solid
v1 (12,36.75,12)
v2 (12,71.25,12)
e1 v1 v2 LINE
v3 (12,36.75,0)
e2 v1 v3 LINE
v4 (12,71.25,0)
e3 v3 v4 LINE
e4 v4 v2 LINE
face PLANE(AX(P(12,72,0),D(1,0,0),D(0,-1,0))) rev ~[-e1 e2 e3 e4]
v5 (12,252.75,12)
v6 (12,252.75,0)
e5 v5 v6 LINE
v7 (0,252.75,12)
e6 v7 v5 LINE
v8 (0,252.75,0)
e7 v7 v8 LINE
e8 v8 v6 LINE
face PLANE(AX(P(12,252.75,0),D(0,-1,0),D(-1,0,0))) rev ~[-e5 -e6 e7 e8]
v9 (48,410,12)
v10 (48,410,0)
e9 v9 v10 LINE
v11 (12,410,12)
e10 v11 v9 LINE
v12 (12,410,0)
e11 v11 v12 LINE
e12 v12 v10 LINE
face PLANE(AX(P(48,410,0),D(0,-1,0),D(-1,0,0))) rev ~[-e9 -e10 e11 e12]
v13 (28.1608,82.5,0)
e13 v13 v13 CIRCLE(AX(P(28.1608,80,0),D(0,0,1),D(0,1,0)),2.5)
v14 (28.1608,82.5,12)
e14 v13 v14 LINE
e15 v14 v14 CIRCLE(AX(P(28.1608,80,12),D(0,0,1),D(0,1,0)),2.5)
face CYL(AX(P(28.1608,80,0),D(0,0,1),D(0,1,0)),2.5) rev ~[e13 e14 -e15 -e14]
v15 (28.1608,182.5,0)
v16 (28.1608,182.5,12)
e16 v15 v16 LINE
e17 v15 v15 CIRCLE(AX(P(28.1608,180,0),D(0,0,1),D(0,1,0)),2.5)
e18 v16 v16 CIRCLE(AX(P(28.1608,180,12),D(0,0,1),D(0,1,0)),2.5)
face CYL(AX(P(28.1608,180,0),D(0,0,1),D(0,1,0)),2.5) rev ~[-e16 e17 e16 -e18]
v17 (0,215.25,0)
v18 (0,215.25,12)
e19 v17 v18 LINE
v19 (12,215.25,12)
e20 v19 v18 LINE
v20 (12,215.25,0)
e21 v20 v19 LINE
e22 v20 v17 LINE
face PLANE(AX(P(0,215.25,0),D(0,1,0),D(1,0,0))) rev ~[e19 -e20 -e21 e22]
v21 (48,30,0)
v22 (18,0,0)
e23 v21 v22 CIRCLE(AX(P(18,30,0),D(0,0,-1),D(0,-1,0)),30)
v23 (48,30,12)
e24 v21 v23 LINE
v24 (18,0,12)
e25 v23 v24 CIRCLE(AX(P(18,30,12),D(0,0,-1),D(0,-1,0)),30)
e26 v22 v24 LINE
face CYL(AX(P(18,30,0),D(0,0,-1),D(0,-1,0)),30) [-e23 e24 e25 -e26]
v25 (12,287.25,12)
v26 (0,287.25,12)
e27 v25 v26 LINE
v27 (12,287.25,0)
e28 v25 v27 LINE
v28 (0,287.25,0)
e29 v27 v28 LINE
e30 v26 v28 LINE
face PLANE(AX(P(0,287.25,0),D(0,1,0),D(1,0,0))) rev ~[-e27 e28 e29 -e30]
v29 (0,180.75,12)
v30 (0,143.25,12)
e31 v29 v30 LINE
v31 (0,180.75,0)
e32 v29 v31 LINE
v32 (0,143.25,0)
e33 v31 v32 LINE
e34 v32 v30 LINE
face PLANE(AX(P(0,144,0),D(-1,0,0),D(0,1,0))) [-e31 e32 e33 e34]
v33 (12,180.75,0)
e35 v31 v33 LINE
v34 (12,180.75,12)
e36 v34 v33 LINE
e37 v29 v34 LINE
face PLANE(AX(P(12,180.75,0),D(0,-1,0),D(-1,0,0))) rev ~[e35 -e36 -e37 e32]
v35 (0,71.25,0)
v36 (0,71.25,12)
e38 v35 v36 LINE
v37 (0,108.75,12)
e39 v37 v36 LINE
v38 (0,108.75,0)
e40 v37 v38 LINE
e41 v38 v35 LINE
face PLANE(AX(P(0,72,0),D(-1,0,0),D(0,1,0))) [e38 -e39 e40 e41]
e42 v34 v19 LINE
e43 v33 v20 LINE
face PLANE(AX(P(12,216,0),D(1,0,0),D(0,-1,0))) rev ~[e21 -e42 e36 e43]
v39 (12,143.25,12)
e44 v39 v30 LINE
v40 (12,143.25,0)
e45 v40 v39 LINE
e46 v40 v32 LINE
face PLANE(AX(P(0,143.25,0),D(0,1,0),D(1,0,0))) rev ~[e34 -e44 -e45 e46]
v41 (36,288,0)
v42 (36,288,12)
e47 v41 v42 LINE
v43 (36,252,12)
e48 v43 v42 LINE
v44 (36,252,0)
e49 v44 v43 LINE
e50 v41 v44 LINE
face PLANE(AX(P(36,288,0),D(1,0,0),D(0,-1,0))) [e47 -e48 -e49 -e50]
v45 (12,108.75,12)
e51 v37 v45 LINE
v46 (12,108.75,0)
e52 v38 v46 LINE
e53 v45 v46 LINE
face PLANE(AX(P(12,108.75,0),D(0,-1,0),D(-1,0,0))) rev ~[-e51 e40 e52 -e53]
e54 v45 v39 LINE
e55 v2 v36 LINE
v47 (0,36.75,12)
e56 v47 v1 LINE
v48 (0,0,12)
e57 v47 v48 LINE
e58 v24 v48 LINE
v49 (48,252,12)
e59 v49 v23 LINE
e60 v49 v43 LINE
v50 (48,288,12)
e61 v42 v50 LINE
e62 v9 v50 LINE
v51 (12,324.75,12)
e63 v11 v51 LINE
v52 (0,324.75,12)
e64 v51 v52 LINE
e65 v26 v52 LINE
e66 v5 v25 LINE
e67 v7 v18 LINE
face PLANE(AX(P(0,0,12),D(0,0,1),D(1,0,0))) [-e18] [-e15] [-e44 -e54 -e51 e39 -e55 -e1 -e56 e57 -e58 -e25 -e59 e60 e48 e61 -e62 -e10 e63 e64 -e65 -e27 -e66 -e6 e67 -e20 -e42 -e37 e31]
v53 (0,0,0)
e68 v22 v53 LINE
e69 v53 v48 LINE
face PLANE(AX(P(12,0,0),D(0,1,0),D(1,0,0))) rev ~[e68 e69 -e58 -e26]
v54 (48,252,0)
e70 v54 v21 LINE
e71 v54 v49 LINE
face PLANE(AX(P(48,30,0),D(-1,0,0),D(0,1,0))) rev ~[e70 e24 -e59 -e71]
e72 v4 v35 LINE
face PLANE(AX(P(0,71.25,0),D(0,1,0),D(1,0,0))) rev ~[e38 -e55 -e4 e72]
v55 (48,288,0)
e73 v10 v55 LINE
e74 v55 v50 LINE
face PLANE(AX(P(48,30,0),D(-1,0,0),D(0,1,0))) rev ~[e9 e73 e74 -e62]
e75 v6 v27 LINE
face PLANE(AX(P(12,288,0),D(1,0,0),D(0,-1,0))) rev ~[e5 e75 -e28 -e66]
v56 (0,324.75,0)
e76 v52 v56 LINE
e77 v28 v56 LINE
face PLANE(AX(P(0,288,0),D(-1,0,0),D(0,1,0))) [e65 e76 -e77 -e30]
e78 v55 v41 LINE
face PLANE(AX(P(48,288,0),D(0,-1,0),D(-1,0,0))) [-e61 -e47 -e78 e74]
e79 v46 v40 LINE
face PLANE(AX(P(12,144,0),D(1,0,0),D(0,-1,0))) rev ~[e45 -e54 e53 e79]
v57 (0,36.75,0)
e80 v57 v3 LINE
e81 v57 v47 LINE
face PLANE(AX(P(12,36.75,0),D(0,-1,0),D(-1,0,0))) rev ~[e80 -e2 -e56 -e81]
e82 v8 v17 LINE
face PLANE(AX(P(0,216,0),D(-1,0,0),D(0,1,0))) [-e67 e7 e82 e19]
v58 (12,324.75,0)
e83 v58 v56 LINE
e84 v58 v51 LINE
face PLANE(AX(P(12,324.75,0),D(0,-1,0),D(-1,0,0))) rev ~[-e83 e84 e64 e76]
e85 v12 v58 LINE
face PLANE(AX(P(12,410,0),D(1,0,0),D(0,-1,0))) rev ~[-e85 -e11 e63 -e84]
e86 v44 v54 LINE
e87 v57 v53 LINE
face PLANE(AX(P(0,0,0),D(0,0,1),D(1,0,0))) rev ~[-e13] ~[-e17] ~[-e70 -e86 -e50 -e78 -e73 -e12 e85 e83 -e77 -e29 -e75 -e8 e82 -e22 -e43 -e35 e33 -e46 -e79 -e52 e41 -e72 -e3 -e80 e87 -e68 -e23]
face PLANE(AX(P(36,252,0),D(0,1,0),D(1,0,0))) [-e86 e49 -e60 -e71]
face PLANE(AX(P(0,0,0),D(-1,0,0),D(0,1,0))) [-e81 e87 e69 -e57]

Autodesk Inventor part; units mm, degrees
ref_plane "YZ Plane" through (0, 0, 0) normal (1, 0, 0) x (0, 1, 0)
ref_plane "XZ Plane" through (0, 0, 0) normal (0, 1, 0) x (-1, 0, 0)
ref_plane "XY Plane" through (0, 0, 0) normal (0, 0, 1) x (1, 0, 0)
ref_plane "Work Plane1" through (0, 0, 0) normal (0, 0, 1) x (1, 0, 0)
sketch "Sketch1" plane through (0, 0, 0) normal (0, 0, 1) x (1, 0, 0)
  line L0 (12, 534.827) -> (0, 534.827)
  line L1 (0, 534.827) -> (0, 622.3733)
  line L2 (0, 622.3733) -> (12, 622.3733)
  line L3 (12, 622.3733) -> (12, 534.827)
  line L4 (0, 476.4832) -> (12, 476.4832)
  line L5 (12, 476.4832) -> (12, 324)
  line L6 (12, 324) -> (0, 324)
  line L7 (0, 288) -> (0, 324)
  line L8 (0, 288) -> (12, 288)
  line L9 (12, 288) -> (12, 252)
  line L10 (12, 252) -> (0, 252)
  line L11 (0, 216) -> (0, 252)
  line L12 (0, 216) -> (12, 216)
  line L13 (12, 216) -> (12, 180)
  line L14 (12, 180) -> (0, 180)
  line L15 (0, 144) -> (0, 180)
  line L16 (0, 144) -> (12, 144)
  line L17 (12, 144) -> (12, 108)
  line L18 (12, 108) -> (0, 108)
  line L19 (0, 72) -> (0, 108)
  line L20 (0, 72) -> (12, 72)
  line L21 (12, 72) -> (12, 36)
  line L22 (12, 36) -> (0, 36)
  line L23 (0, 0) -> (0, 36)
  line L24 (12, 0) -> (0, 0)
  line L25 (12, 36) -> (12, 0)
  line L26 (0, 324) -> (0, 476.4832)
  line L27 (12, 324) -> (12, 288)
  line L28 (0, 252) -> (0, 288)
  line L29 (12, 252) -> (12, 216)
  line L30 (0, 180) -> (0, 216)
  line L31 (12, 180) -> (12, 144)
  line L32 (0, 108) -> (0, 144)
  line L33 (12, 108) -> (12, 72)
  line L34 (0, 36) -> (0, 72)
  line L35 (12, 0) -> (18, 0)
  line L36 (48, 30) -> (48, 410)
  line L37 (48, 410) -> (12, 410)
  line L38 (12, 410) -> (12, 0)
  arc A0 (18, 0) -> (48, 30) centre (18, 30) ccw
  point P0 (48, 0)
  dimension "d0" = 36
  dimension "d1" = 410
  dimension "d34" = 30
extrude "Extrusion1" add sketch "Sketch1" along normal blind 12 contours L6 L27 L8 L7 | L37 L36 A0 L35 L25 L21 L33 L17 L31 L13 L29 L9 L27 L5 | L10 L29 L12 L11 | L14 L31 L16 L15 | L24 L23 L22 L25 | L18 L33 L20 L19
sketch "Sketch2" plane through (0, 481.1893, 141.342) normal (0, -0.8660254, 0.5) x (1, 0, 0)
  line L0 (0, 0) -> (0, 36) projected
  line L1 (0, 0) -> (12, 0) projected
  line L2 (12, 36) -> (12, 0) projected
  line L3 (0, 36) -> (12, 36) projected
  line L4 (0, -72) -> (0, -36) projected
  line L5 (0, -72) -> (12, -72) projected
  line L6 (12, -36) -> (12, -72) projected
  line L7 (0, -36) -> (12, -36) projected
  line L8 (0, -144) -> (0, -108) projected
  line L9 (0, -144) -> (12, -144) projected
  line L10 (12, -108) -> (12, -144) projected
  line L11 (0, -108) -> (12, -108) projected
  line L12 (48, -147.6081) -> (12, -147.6081) projected
  line L13 (12, 36) -> (624, 36)
  line L14 (624, 36) -> (624, -164)
  line L15 (624, -164) -> (12, -164)
  line L16 (12, -164) -> (12, 36)
  line L17 (318, -164) -> (318, 36) construction
  line L18 (636, 0) -> (636, 36)
  line L19 (636, 0) -> (624, 0)
  line L20 (624, 36) -> (624, 0)
  line L21 (636, 36) -> (624, 36)
  line L22 (636, -72) -> (636, -36)
  line L23 (636, -72) -> (624, -72)
  line L24 (624, -36) -> (624, -72)
  line L25 (636, -36) -> (624, -36)
  line L26 (636, -144) -> (636, -108)
  line L27 (636, -144) -> (624, -144)
  line L28 (624, -108) -> (624, -144)
  line L29 (636, -108) -> (624, -108)
  line L30 (588, -147.6081) -> (624, -147.6081)
  line L31 (624, -164) -> (624, 36)
  line L32 (12, 36) -> (48, 36)
  line L33 (48, 36) -> (48, 24)
  line L34 (48, 24) -> (12, 24)
  line L35 (12, 24) -> (12, 36)
  line L36 (84, 24) -> (48, 24)
  line L37 (84, 36) -> (84, 24)
  line L38 (48, 36) -> (84, 36)
  line L39 (48, 24) -> (48, 36)
  line L40 (120, 24) -> (84, 24)
  line L41 (120, 36) -> (120, 24)
  line L42 (84, 36) -> (120, 36)
  line L43 (84, 24) -> (84, 36)
  line L44 (156, 24) -> (120, 24)
  line L45 (156, 36) -> (156, 24)
  line L46 (120, 36) -> (156, 36)
  line L47 (120, 24) -> (120, 36)
  line L48 (192, 24) -> (156, 24)
  line L49 (192, 36) -> (192, 24)
  line L50 (156, 36) -> (192, 36)
  line L51 (156, 24) -> (156, 36)
  line L52 (228, 24) -> (192, 24)
  line L53 (228, 36) -> (228, 24)
  line L54 (192, 36) -> (228, 36)
  line L55 (192, 24) -> (192, 36)
  line L56 (264, 24) -> (228, 24)
  line L57 (264, 36) -> (264, 24)
  line L58 (228, 36) -> (264, 36)
  line L59 (228, 24) -> (228, 36)
  line L60 (300, 24) -> (264, 24)
  line L61 (300, 36) -> (300, 24)
  line L62 (264, 36) -> (300, 36)
  line L63 (264, 24) -> (264, 36)
  line L64 (336, 24) -> (300, 24)
  line L65 (336, 36) -> (336, 24)
  line L66 (300, 36) -> (336, 36)
  line L67 (300, 24) -> (300, 36)
  line L68 (372, 24) -> (336, 24)
  line L69 (372, 36) -> (372, 24)
  line L70 (336, 36) -> (372, 36)
  line L71 (336, 24) -> (336, 36)
  line L72 (408, 24) -> (372, 24)
  line L73 (408, 36) -> (408, 24)
  line L74 (372, 36) -> (408, 36)
  line L75 (372, 24) -> (372, 36)
  line L76 (444, 24) -> (408, 24)
  line L77 (444, 36) -> (444, 24)
  line L78 (408, 36) -> (444, 36)
  line L79 (408, 24) -> (408, 36)
  line L80 (480, 24) -> (444, 24)
  line L81 (480, 36) -> (480, 24)
  line L82 (444, 36) -> (480, 36)
  line L83 (444, 24) -> (444, 36)
  line L84 (516, 24) -> (480, 24)
  line L85 (516, 36) -> (516, 24)
  line L86 (480, 36) -> (516, 36)
  line L87 (480, 24) -> (480, 36)
  line L88 (552, 24) -> (516, 24)
  line L89 (552, 36) -> (552, 24)
  line L90 (516, 36) -> (552, 36)
  line L91 (516, 24) -> (516, 36)
  line L92 (588, 24) -> (552, 24)
  line L93 (588, 36) -> (588, 24)
  line L94 (552, 36) -> (588, 36)
  line L95 (552, 24) -> (552, 36)
  line L96 (624, 24) -> (588, 24)
  line L97 (624, 36) -> (624, 24)
  line L98 (588, 36) -> (624, 36)
  line L99 (588, 24) -> (588, 36)
  line L100 (660, 24) -> (624, 24)
  line L101 (660, 36) -> (660, 24)
  line L102 (624, 36) -> (660, 36)
  line L103 (624, 24) -> (624, 36)
  line L104 (696, 24) -> (660, 24)
  line L105 (696, 36) -> (696, 24)
  line L106 (660, 36) -> (696, 36)
  line L107 (660, 24) -> (660, 36)
  line L108 (732, 24) -> (696, 24)
  line L109 (732, 36) -> (732, 24)
  line L110 (696, 36) -> (732, 36)
  line L111 (696, 24) -> (696, 36)
  line L112 (12, -64) -> (624, -64) construction
  line L113 (12, -164) -> (12, -128)
  line L114 (12, -164) -> (624, -164)
  line L115 (12, -164) -> (48, -164)
  line L116 (48, -164) -> (48, -152)
  line L117 (48, -152) -> (12, -152)
  line L118 (12, -152) -> (12, -164)
  line L119 (84, -152) -> (48, -152)
  line L120 (84, -164) -> (84, -152)
  line L121 (48, -164) -> (84, -164)
  line L122 (48, -152) -> (48, -164)
  line L123 (120, -152) -> (84, -152)
  line L124 (120, -164) -> (120, -152)
  line L125 (84, -164) -> (120, -164)
  line L126 (84, -152) -> (84, -164)
  line L127 (156, -152) -> (120, -152)
  line L128 (156, -164) -> (156, -152)
  line L129 (120, -164) -> (156, -164)
  line L130 (120, -152) -> (120, -164)
  line L131 (192, -152) -> (156, -152)
  line L132 (192, -164) -> (192, -152)
  line L133 (156, -164) -> (192, -164)
  line L134 (156, -152) -> (156, -164)
  line L135 (228, -152) -> (192, -152)
  line L136 (228, -164) -> (228, -152)
  line L137 (192, -164) -> (228, -164)
  line L138 (192, -152) -> (192, -164)
  line L139 (264, -152) -> (228, -152)
  line L140 (264, -164) -> (264, -152)
  line L141 (228, -164) -> (264, -164)
  line L142 (228, -152) -> (228, -164)
  line L143 (300, -152) -> (264, -152)
  line L144 (300, -164) -> (300, -152)
  line L145 (264, -164) -> (300, -164)
  line L146 (264, -152) -> (264, -164)
  line L147 (336, -152) -> (300, -152)
  line L148 (336, -164) -> (336, -152)
  line L149 (300, -164) -> (336, -164)
  line L150 (300, -152) -> (300, -164)
  line L151 (372, -152) -> (336, -152)
  line L152 (372, -164) -> (372, -152)
  line L153 (336, -164) -> (372, -164)
  line L154 (336, -152) -> (336, -164)
  line L155 (408, -152) -> (372, -152)
  line L156 (408, -164) -> (408, -152)
  line L157 (372, -164) -> (408, -164)
  line L158 (372, -152) -> (372, -164)
  line L159 (444, -152) -> (408, -152)
  line L160 (444, -164) -> (444, -152)
  line L161 (408, -164) -> (444, -164)
  line L162 (408, -152) -> (408, -164)
  line L163 (480, -152) -> (444, -152)
  line L164 (480, -164) -> (480, -152)
  line L165 (444, -164) -> (480, -164)
  line L166 (444, -152) -> (444, -164)
  line L167 (516, -152) -> (480, -152)
  line L168 (516, -164) -> (516, -152)
  line L169 (480, -164) -> (516, -164)
  line L170 (480, -152) -> (480, -164)
  line L171 (552, -152) -> (516, -152)
  line L172 (552, -164) -> (552, -152)
  line L173 (516, -164) -> (552, -164)
  line L174 (516, -152) -> (516, -164)
  line L175 (588, -152) -> (552, -152)
  line L176 (588, -164) -> (588, -152)
  line L177 (552, -164) -> (588, -164)
  line L178 (552, -152) -> (552, -164)
  line L179 (624, -152) -> (588, -152)
  line L180 (624, -164) -> (624, -152)
  line L181 (588, -164) -> (624, -164)
  line L182 (588, -152) -> (588, -164)
  line L183 (624, -152) -> (624, -164)
  circle A0 centre (318, -64) radius 2.5
  circle A1 centre (218, -64) radius 2.5
  circle A2 centre (118, -64) radius 2.5
  line L184 (624, -64) -> (12, -64) construction
  circle A3 centre (318, -64) radius 2.5
  circle A4 centre (418, -64) radius 2.5
  circle A5 centre (518, -64) radius 2.5
  circle A6 centre (168, -14) radius 2.5
  circle A7 centre (268, -14) radius 2.5
  circle A8 centre (468, -14) radius 2.5
  circle A9 centre (368, -14) radius 2.5
  line L185 (318, 36) -> (318, -164) construction
  circle A10 centre (168, -114) radius 2.5
  circle A11 centre (268, -114) radius 2.5
  circle A12 centre (468, -114) radius 2.5
  circle A13 centre (368, -114) radius 2.5
  point P0 (0, -363.0004)
  point P1 (48, 24)
  point P2 (12, 0)
  point P3 (12, -72)
  point P4 (12, -108)
  point P5 (12, -144)
  point P6 (12, -152)
  point P7 (48, -164)
  point P8 (84, -164)
  point P9 (84, -152)
  point P10 (120, -164)
  point P11 (156, -164)
  point P12 (156, -152)
  point P13 (192, -164)
  point P14 (228, -164)
  point P15 (228, -152)
  point P16 (264, -164)
  point P17 (300, -164)
  point P18 (300, -152)
  point P19 (336, -164)
  point P20 (372, -164)
  point P21 (372, -152)
  point P22 (408, -164)
  point P23 (444, -164)
  point P24 (444, -152)
  point P25 (480, -164)
  point P26 (516, -164)
  point P27 (516, -152)
  point P28 (552, -164)
  point P29 (588, -164)
  point P30 (624, -144)
  point P31 (624, -108)
  point P32 (624, -72)
  point P33 (624, -36)
  point P34 (624, 0)
  point P35 (552, 24)
  point P36 (552, 36)
  point P37 (516, 36)
  point P38 (480, 24)
  point P39 (480, 36)
  point P40 (444, 36)
  point P41 (408, 36)
  point P42 (372, 36)
  point P43 (336, 24)
  point P44 (336, 36)
  point P45 (300, 36)
  point P46 (264, 24)
  point P47 (264, 36)
  point P48 (228, 36)
  point P49 (192, 24)
  point P50 (192, 36)
  point P51 (156, 36)
  point P52 (120, 24)
  point P53 (120, 36)
  point P54 (84, 36)
  dimension "d4" = 612
  dimension "d5" = 200
  dimension "d6" = 12
  dimension "d7" = 36
  dimension "d10" = 36
  dimension "d21" = 5
  dimension "d24" = 100
  dimension "d29" = 5
  dimension "d30" = 5
  dimension "d31" = 100
  dimension "d32" = 50
  dimension "d33" = 50
sketch "Sketch3" plane through (0, 470.797, 147.342) normal (0, -0.8660254, 0.5) x (1, 0, 0)
  line L0 (588, -164) -> (588, -152) projected
  line L1 (588, -152) -> (624, -152) projected
  line L2 (624, -152) -> (624, -144) projected
  line L3 (624, -144) -> (636, -144) projected
  line L4 (636, -144) -> (636, -108) projected
  line L5 (636, -108) -> (624, -108) projected
  line L6 (624, -108) -> (624, -72) projected
  line L7 (624, -72) -> (636, -72) projected
  line L8 (636, -72) -> (636, -36) projected
  line L9 (636, -36) -> (624, -36) projected
  line L10 (624, -36) -> (624, 0) projected
  line L11 (624, 0) -> (636, 0) projected
  line L12 (636, 0) -> (636, 36) projected
  line L13 (636, 36) -> (588, 36) projected
  line L14 (588, 36) -> (588, 24) projected
  line L15 (588, 24) -> (552, 24) projected
  line L16 (552, 24) -> (552, 36) projected
  line L17 (552, 36) -> (516, 36) projected
  line L18 (516, 36) -> (516, 24) projected
  line L19 (516, 24) -> (480, 24) projected
  line L20 (480, 24) -> (480, 36) projected
  line L21 (264, 36) -> (156, 36) projected
  line L22 (480, 36) -> (372, 36) projected
  line L23 (372, 36) -> (372, 24) projected
  line L24 (372, 24) -> (336, 24) projected
  line L25 (336, 24) -> (336, 36) projected
  line L26 (336, 36) -> (300, 36) projected
  line L27 (300, 36) -> (300, 24) projected
  line L28 (300, 24) -> (264, 24) projected
  line L29 (264, 24) -> (264, 36) projected
  line L30 (156, 36) -> (156, 24) projected
  line L31 (156, 24) -> (120, 24) projected
  line L32 (120, 24) -> (120, 36) projected
  line L33 (120, 36) -> (84, 36) projected
  line L34 (84, 36) -> (84, 24) projected
  line L35 (84, 24) -> (48, 24) projected
  line L36 (48, 24) -> (48, 36) projected
  line L37 (48, 36) -> (0, 36) projected
  line L38 (0, 36) -> (0, 0) projected
  line L39 (0, 0) -> (12, 0) projected
  line L40 (12, 0) -> (12, -36) projected
  line L41 (12, -36) -> (0, -36) projected
  line L42 (0, -36) -> (0, -72) projected
  line L43 (0, -72) -> (12, -72) projected
  line L44 (12, -72) -> (12, -108) projected
  line L45 (12, -108) -> (0, -108) projected
  line L46 (0, -108) -> (0, -144) projected
  line L47 (0, -144) -> (12, -144) projected
  line L48 (12, -144) -> (12, -152) projected
  line L49 (12, -152) -> (48, -152) projected
  line L50 (48, -152) -> (48, -156.2795) projected
  line L51 (48, -164) -> (84, -164) projected
  line L52 (84, -164) -> (84, -152) projected
  line L53 (84, -152) -> (120, -152) projected
  line L54 (120, -152) -> (120, -164) projected
  line L55 (120, -164) -> (156, -164) projected
  line L56 (156, -164) -> (156, -152) projected
  line L57 (156, -152) -> (192, -152) projected
  line L58 (192, -152) -> (192, -164) projected
  line L59 (192, -164) -> (228, -164) projected
  line L60 (228, -164) -> (228, -152) projected
  line L61 (228, -152) -> (264, -152) projected
  line L62 (264, -152) -> (264, -164) projected
  line L63 (264, -164) -> (300, -164) projected
  line L64 (300, -164) -> (300, -152) projected
  line L65 (300, -152) -> (336, -152) projected
  line L66 (336, -152) -> (336, -164) projected
  line L67 (336, -164) -> (372, -164) projected
  line L68 (372, -164) -> (372, -152) projected
  line L69 (372, -152) -> (408, -152) projected
  line L70 (408, -152) -> (408, -164) projected
  line L71 (408, -164) -> (444, -164) projected
  line L72 (444, -164) -> (444, -152) projected
  line L73 (444, -152) -> (480, -152) projected
  line L74 (480, -152) -> (480, -164) projected
  line L75 (480, -164) -> (516, -164) projected
  line L76 (516, -164) -> (516, -152) projected
  line L77 (516, -152) -> (552, -152) projected
  line L78 (552, -152) -> (552, -164) projected
  line L79 (552, -164) -> (588, -164) projected
  line L80 (156, 36) -> (167.3747, 64.5218)
  line L81 (213.8176, 96) -> (422.1824, 96)
  line L82 (468.6253, 64.5218) -> (480, 36)
  arc A0 (213.8176, 96) -> (167.3747, 64.5218) centre (213.8176, 46) ccw
  arc A1 (468.6253, 64.5218) -> (422.1824, 96) centre (422.1824, 46) ccw
  line L83 (336, 36) -> (300, 36) projected
  line L84 (156, 36) -> (480, 36)
  line L85 (48, -164) -> (48, -156.2795) projected
  point P0 (0, -363.0004)
  point P1 (300, 36)
  point P2 (336, 36)
  point P3 (264, 36)
  point P4 (372, 36)
  point P5 (300, 36)
  point P6 (264, 36)
  point P7 (264, 36)
  dimension "d17" = 50
  dimension "d20" = 60
move faces "Move1" translate (0, 0.75, 0) faces at (8, 36, 4) (8, 108, 4) (8, 180, 4) (8, 252, 4) (8, 324, 4)
move faces "Move2" translate (0, -0.75, 0) faces at (4, 288, 4) (4, 216, 4) (4, 144, 4) (4, 72, 4)
sketch "Sketch5" plane through (0, 0, 12) normal (0, 0, 1) x (1, 0, 0)
  line L0 (0, 0) -> (18, 0) projected
  arc A0 (18, 0) -> (48, 30) centre (18, 30) ccw projected
  line L1 (48, 30) -> (48, 410) projected
  line L2 (48, 410) -> (12, 410) projected
  line L3 (12, 410) -> (12, 324.75) projected
  line L4 (12, 324.75) -> (0, 324.75) projected
  line L5 (0, 324.75) -> (0, 287.25) projected
  line L6 (0, 287.25) -> (12, 287.25) projected
  line L7 (12, 287.25) -> (12, 252.75) projected
  line L8 (12, 252.75) -> (0, 252.75) projected
  line L9 (0, 252.75) -> (0, 215.25) projected
  line L10 (0, 215.25) -> (12, 215.25) projected
  line L11 (12, 215.25) -> (12, 180.75) projected
  line L12 (12, 180.75) -> (0, 180.75) projected
  line L13 (0, 180.75) -> (0, 143.25) projected
  line L14 (0, 143.25) -> (12, 143.25) projected
  line L15 (12, 143.25) -> (12, 108.75) projected
  line L16 (12, 108.75) -> (0, 108.75) projected
  line L17 (0, 108.75) -> (0, 71.25) projected
  line L18 (0, 71.25) -> (12, 71.25) projected
  line L19 (12, 71.25) -> (12, 36.75) projected
  line L20 (12, 36.75) -> (0, 36.75) projected
  line L21 (0, 36.75) -> (0, 0) projected
sketch "Sketch6" plane through (0, 0, 0) normal (0, 0, -1) x (-1, 0, 0)
  line L0 (-48, 410) -> (-36, 410)
  line L1 (-36, 410) -> (-36, 288)
  line L2 (-48, 288) -> (-36, 288)
  line L3 (-48, 252) -> (-48, 288)
  line L4 (-36, 252) -> (-48, 252)
  line L5 (-36, 288) -> (-36, 252)
  line L6 (-48, 288) -> (-48, 410)
  point P0 (0, 0)
extrude "Extrusion4" cut sketch "Sketch6" against normal through all contours L2 L5 L4 L3
sketch "Sketch7" plane through (0, 0, 0) normal (0, 0, -1) x (-1, 0, 0)
  line L0 (0, 146.4051) -> (0, 106.4051)
  line L1 (0, 0) -> (-18, 0) projected
  point P0 (-28.1608, 80)
  point P1 (-28.1608, 180)
  point P2 (-28.1608, 280)
  dimension "d43" = 80
  dimension "d44" = 100
  dimension "d45" = 100
hole "Hole1" at (28.1608, 180, 0) at (28.1608, 80, 0) direction (0, 0, 1) diameter 5 end through all
sketch "Sketch8" plane through (0, 0, 12) normal (0, 0, 1) x (1, 0, 0)
  circle A0 centre (28.1608, 180) radius 2.5 projected
  circle A1 centre (28.1608, 80) radius 2.5 projected
  line L0 (48, 252) -> (36, 252) projected
  line L1 (36, 252) -> (36, 288) projected
  line L2 (36, 288) -> (48, 288) projected
  line L3 (48, 288) -> (48, 410) projected
  line L4 (48, 410) -> (12, 410) projected
  line L5 (12, 410) -> (12, 324.75) projected
  line L6 (12, 324.75) -> (0, 324.75) projected
  line L7 (0, 324.75) -> (0, 287.25) projected
  line L8 (0, 287.25) -> (12, 287.25) projected
  line L9 (12, 287.25) -> (12, 252.75) projected
  line L10 (12, 252.75) -> (0, 252.75) projected
  line L11 (0, 252.75) -> (0, 215.25) projected
  line L12 (0, 215.25) -> (12, 215.25) projected
  line L13 (12, 215.25) -> (12, 180.75) projected
  line L14 (12, 180.75) -> (0, 180.75) projected
  line L15 (0, 180.75) -> (0, 143.25) projected
  line L16 (0, 143.25) -> (12, 143.25) projected
  line L17 (12, 143.25) -> (12, 108.75) projected
  line L18 (12, 108.75) -> (0, 108.75) projected
  line L19 (0, 108.75) -> (0, 71.25) projected
  line L20 (0, 71.25) -> (12, 71.25) projected
  line L21 (12, 71.25) -> (12, 36.75) projected
  line L22 (12, 36.75) -> (0, 36.75) projected
  line L23 (0, 36.75) -> (0, 0) projected
  line L24 (0, 0) -> (18, 0) projected
  arc A2 (18, 0) -> (48, 30) centre (18, 30) ccw projected
  line L25 (48, 30) -> (48, 252) projected
sketch "Sketch9" plane through (0, 0, 0) normal (0, 0, -1) x (-1, 0, 0)
  circle A0 centre (-28.1608, 180) radius 2.5 projected
  circle A1 centre (-28.1608, 80) radius 2.5 projected
  line L0 (-36, 252) -> (-48, 252) projected
  line L1 (-48, 30) -> (-48, 252) projected
  arc A2 (-48, 30) -> (-18, 0) centre (-18, 30) ccw projected
  line L2 (0, 0) -> (-18, 0) projected
  line L3 (0, 36.75) -> (0, 0) projected
  line L4 (-12, 36.75) -> (0, 36.75) projected
  line L5 (-12, 71.25) -> (-12, 36.75) projected
  line L6 (0, 71.25) -> (-12, 71.25) projected
  line L7 (0, 108.75) -> (0, 71.25) projected
  line L8 (-12, 108.75) -> (0, 108.75) projected
  line L9 (-12, 143.25) -> (-12, 108.75) projected
  line L10 (0, 143.25) -> (-12, 143.25) projected
  line L11 (0, 180.75) -> (0, 143.25) projected
  line L12 (-12, 180.75) -> (0, 180.75) projected
  line L13 (-12, 215.25) -> (-12, 180.75) projected
  line L14 (0, 215.25) -> (-12, 215.25) projected
  line L15 (0, 252.75) -> (0, 215.25) projected
  line L16 (-12, 252.75) -> (0, 252.75) projected
  line L17 (-12, 287.25) -> (-12, 252.75) projected
  line L18 (0, 287.25) -> (-12, 287.25) projected
  line L19 (0, 324.75) -> (0, 287.25) projected
  line L20 (-12, 324.75) -> (0, 324.75) projected
  line L21 (-12, 410) -> (-12, 324.75) projected
  line L22 (-48, 410) -> (-12, 410) projected
  line L23 (-48, 288) -> (-48, 410) projected
  line L24 (-48, 288) -> (-36, 288) projected
  line L25 (-36, 288) -> (-36, 252) projected
equation "\"d4\" = 17 * d7"
equation "\"d7\" = 3 * d6"
equation "\"d10\" = d7"
equation "\"d31\" = d24"
equation "\"d32\" = 0.5 * d31"
equation "\"d33\" = d32"
equation "\"d45\" = d44"
properties part number "wooden_lip"
